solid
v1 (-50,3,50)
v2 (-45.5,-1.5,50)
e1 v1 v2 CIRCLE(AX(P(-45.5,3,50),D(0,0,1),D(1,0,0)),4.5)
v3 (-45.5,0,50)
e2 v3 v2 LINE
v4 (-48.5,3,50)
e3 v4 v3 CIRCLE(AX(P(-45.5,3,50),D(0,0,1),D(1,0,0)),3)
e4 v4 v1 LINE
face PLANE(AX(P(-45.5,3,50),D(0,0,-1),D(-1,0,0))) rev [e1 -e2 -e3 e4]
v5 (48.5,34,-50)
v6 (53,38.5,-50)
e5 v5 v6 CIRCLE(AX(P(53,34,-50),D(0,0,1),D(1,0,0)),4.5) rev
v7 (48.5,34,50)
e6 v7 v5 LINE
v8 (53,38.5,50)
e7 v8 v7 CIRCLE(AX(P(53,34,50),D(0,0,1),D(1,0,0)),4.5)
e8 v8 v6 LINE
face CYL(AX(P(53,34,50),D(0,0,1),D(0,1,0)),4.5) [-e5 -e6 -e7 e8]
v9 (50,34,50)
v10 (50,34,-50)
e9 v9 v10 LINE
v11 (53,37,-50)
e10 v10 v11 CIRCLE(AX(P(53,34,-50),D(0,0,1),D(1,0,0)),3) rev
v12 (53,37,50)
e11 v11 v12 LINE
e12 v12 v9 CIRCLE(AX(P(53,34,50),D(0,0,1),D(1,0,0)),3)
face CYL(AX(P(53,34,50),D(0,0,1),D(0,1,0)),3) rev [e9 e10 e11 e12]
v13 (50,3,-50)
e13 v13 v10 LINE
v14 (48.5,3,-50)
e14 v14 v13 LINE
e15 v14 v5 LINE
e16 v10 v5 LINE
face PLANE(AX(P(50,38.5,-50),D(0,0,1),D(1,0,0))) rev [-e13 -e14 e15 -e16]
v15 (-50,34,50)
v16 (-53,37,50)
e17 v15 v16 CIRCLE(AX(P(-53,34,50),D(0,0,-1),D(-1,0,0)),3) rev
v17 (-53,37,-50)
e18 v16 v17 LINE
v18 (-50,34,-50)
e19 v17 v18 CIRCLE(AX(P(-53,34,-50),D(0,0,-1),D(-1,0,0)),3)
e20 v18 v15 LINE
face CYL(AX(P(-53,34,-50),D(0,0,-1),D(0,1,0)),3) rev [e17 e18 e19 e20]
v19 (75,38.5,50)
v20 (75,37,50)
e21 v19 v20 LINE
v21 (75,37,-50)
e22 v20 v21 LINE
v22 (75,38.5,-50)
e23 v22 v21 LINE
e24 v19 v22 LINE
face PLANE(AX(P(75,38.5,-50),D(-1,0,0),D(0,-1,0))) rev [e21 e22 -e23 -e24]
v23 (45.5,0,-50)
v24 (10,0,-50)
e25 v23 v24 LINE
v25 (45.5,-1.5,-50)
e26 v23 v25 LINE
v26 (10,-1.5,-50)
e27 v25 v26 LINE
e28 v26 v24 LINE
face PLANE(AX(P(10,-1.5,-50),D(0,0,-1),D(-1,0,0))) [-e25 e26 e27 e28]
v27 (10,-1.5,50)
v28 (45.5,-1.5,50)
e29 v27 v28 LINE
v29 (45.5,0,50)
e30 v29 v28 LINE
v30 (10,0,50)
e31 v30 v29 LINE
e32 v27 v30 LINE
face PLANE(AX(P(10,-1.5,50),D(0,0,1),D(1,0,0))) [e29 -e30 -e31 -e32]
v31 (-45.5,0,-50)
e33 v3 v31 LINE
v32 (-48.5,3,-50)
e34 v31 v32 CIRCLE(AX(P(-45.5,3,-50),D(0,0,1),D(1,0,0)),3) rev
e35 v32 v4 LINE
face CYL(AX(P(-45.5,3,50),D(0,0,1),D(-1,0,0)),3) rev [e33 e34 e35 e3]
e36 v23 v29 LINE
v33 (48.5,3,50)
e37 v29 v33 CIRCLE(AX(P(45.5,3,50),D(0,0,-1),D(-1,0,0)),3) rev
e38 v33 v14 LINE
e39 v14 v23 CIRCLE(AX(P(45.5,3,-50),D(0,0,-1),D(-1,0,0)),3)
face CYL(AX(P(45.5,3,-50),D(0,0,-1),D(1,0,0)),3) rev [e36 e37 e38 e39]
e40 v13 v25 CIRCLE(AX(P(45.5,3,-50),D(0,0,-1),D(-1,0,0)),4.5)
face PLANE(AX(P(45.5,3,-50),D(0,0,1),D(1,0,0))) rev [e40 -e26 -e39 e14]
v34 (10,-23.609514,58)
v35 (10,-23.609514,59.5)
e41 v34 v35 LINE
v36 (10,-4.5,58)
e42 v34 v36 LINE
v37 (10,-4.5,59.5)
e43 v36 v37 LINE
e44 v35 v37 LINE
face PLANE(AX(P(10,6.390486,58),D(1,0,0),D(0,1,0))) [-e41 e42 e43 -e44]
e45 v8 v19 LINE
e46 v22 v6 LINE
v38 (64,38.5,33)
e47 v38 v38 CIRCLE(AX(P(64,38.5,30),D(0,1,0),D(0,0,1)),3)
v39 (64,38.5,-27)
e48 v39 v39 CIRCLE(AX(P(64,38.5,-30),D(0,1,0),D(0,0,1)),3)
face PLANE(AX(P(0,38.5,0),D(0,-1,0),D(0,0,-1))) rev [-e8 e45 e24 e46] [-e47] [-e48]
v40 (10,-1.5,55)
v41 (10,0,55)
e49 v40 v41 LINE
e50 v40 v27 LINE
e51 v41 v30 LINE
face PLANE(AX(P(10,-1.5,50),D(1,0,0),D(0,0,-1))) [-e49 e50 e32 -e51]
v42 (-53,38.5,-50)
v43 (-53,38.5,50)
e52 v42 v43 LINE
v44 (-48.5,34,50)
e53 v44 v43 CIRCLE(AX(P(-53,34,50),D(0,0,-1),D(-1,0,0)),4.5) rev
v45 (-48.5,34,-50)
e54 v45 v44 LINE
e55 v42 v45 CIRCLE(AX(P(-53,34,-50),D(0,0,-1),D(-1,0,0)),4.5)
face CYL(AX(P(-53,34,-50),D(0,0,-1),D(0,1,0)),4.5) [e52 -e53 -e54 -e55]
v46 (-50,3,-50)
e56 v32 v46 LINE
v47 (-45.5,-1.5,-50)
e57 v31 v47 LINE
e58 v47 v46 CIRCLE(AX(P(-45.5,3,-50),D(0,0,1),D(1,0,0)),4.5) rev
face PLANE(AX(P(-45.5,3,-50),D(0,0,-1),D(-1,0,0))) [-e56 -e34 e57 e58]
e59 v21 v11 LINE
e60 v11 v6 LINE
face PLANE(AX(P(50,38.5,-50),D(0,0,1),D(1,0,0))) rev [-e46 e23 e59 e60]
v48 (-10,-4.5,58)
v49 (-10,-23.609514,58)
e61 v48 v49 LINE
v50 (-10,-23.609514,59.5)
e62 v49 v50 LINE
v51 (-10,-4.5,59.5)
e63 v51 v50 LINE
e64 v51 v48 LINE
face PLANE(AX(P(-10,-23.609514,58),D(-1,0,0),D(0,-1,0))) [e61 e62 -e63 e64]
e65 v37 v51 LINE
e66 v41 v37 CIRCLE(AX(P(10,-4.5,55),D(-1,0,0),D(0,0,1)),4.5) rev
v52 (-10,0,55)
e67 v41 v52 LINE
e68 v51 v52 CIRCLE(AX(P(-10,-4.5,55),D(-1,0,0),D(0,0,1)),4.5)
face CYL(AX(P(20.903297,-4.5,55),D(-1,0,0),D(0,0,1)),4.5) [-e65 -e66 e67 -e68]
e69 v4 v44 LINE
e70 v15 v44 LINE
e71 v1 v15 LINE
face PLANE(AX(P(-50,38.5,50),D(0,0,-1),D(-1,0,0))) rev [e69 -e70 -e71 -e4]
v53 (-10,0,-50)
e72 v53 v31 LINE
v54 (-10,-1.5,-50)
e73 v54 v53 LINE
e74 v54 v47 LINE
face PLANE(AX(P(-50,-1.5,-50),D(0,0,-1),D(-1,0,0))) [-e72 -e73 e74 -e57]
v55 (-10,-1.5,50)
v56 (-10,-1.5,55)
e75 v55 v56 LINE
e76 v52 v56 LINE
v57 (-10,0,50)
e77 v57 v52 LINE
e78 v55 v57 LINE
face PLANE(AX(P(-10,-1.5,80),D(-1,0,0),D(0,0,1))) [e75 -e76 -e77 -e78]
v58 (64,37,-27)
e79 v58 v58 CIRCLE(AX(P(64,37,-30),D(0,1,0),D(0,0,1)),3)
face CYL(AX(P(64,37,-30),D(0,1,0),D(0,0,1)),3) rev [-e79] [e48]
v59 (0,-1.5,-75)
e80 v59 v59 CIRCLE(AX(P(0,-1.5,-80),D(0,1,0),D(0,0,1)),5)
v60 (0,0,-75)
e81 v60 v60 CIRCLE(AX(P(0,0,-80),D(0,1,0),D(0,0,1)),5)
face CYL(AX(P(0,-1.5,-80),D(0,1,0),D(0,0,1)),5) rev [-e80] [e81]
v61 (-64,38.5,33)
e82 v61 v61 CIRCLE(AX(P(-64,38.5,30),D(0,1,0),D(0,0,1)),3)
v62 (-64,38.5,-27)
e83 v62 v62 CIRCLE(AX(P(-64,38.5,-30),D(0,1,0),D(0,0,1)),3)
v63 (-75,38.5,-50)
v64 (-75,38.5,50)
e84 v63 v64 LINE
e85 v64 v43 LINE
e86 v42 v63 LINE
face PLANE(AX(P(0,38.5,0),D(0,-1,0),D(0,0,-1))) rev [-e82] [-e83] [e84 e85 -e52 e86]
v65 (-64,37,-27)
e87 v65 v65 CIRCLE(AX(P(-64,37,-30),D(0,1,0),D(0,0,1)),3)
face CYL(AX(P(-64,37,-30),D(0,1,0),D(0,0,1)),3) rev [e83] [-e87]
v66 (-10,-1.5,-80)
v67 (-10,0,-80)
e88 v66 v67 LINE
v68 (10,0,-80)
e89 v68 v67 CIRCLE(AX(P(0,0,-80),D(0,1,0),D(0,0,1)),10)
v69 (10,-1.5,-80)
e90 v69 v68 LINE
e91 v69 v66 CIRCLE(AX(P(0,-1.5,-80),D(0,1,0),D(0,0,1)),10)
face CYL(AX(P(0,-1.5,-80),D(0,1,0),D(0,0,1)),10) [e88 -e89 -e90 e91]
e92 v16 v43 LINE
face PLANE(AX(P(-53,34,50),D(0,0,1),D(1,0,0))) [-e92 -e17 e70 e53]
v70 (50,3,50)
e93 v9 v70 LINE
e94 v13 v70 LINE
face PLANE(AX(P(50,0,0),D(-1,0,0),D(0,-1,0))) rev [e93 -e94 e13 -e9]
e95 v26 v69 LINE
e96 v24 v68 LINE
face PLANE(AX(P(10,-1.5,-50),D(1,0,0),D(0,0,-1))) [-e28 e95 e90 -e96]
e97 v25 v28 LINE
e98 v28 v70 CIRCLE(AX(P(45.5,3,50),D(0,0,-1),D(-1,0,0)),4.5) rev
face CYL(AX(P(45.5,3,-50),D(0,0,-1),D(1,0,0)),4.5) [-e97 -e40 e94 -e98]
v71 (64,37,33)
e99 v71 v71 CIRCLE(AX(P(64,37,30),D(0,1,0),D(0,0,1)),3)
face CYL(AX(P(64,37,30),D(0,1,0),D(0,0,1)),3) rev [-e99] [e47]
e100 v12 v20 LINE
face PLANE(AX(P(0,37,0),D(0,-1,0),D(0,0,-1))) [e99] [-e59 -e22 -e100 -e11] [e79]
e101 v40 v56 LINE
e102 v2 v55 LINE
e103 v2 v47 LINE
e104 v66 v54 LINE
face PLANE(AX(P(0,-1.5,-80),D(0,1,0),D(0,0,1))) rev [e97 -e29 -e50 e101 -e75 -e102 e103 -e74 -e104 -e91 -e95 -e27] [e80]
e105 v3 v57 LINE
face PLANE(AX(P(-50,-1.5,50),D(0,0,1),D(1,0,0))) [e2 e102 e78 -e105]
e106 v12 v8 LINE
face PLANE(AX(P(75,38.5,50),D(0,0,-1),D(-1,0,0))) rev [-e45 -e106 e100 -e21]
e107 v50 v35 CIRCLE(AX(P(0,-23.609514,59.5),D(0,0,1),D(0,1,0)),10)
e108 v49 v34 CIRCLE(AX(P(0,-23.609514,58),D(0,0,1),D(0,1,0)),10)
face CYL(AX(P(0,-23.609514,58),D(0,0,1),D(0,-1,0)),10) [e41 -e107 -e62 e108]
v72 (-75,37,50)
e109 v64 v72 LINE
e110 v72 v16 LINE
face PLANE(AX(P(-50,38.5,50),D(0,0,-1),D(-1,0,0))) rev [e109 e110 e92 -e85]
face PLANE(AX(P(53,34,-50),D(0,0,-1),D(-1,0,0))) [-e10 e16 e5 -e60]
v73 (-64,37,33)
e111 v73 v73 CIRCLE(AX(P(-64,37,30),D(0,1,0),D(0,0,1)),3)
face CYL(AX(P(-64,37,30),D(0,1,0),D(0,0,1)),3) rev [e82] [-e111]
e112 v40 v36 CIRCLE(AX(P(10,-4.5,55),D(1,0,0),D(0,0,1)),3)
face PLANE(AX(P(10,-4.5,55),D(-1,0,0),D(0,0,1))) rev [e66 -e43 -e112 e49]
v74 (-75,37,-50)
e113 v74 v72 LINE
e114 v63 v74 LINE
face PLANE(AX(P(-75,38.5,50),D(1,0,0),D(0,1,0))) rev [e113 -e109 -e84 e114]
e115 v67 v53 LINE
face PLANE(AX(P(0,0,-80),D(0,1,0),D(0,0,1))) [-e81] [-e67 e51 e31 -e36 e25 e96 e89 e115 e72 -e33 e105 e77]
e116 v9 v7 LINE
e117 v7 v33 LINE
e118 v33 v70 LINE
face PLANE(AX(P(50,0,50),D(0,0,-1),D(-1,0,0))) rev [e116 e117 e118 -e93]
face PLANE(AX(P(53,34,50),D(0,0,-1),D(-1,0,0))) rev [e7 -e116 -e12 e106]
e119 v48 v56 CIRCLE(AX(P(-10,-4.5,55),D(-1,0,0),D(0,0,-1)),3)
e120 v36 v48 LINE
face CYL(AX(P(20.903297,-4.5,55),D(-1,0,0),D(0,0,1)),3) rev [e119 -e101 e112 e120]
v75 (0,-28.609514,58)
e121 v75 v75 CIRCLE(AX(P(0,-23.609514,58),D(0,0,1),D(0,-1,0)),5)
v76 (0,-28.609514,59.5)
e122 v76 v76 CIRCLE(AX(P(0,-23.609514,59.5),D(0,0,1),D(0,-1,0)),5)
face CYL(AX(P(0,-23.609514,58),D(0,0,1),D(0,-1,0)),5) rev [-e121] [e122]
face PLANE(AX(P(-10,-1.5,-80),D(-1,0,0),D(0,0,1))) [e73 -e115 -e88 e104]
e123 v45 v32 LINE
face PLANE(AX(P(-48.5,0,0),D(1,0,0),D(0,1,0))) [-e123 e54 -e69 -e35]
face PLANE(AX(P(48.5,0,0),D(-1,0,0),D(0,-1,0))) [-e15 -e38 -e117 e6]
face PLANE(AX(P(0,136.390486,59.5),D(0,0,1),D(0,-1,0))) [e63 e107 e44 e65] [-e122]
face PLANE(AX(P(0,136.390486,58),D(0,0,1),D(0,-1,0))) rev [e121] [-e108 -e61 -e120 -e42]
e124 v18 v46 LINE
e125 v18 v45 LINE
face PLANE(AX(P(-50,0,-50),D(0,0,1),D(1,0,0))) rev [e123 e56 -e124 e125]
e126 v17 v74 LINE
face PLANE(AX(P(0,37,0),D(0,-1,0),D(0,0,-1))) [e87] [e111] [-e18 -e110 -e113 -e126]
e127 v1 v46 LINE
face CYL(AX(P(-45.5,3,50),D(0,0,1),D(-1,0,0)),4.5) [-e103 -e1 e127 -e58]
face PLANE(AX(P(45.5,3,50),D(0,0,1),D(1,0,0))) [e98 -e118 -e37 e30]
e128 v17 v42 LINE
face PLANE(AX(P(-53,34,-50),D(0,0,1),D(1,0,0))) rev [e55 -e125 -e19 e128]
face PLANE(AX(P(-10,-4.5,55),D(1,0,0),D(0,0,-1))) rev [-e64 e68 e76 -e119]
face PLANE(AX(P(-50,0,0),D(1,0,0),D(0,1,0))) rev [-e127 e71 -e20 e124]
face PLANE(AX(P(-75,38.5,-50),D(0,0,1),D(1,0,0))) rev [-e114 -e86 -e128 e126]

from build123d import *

# Parameters (mm, degrees)
SKETCH1_R                      = 5
BASE_FLANGE1_DEPTH             = 1.5
EDGE_FLANGE1_STRIP_W           = 12
EDGE_FLANGE1_STRIP_H           = 1.5
EDGE_FLANGE1_STRIP_CUT_DEPTH   = 100
EDGE_FLANGE1_STRIP_2_W         = 12
EDGE_FLANGE1_STRIP_2_H         = 1.5
EDGE_FLANGE1_STRIP_CUT_2_DEPTH = 100
EDGE_FLANGE1_DEPTH             = 100
EDGE_FLANGE1_BEND_DEPTH        = 100
EDGE_FLANGE2_STRIP_W           = 12
EDGE_FLANGE2_STRIP_H           = 1.5
EDGE_FLANGE2_STRIP_CUT_DEPTH   = 100
EDGE_FLANGE2_STRIP_2_W         = 12
EDGE_FLANGE2_STRIP_2_H         = 1.5
EDGE_FLANGE2_STRIP_CUT_2_DEPTH = 100
EDGE_FLANGE2_DEPTH             = 100
EDGE_FLANGE2_BEND_DEPTH        = 100
SKETCHED_START                 = 58.9178
SKETCHED_BEND1_OUTLINE_W       = 20
SKETCHED_BEND1_OUTLINE_H       = 1.5
SKETCHED_BEND1_DEPTH           = 32.0822
SKETCHED_START_2               = 56.266894772
SKETCHED_BEND1_2_OUTLINE_R     = 5
SKETCHED_BEND1_2_DEPTH         = 3.233105228
SKETCHED_START_3               = -10
SKETCHED_BEND1_3_DEPTH         = 20
SKETCHED_BEND1_4_DEPTH         = 20
SKETCH21_R                     = 3
CUT_EXTRUDE1_DEPTH             = 10


with BuildPart() as part:
    # Base-Flange1: sheet metal written as solids
    # Sketch1 → Base-Flange1 (new body)
    with BuildSketch(Plane(origin=(0, 0, 0), x_dir=(1, 0, 0), z_dir=(0, 1, 0))):
        with BuildLine():
            Line((10, 50), (10, 80))
            ThreePointArc((10, 80), (0, 90), (-10, 80))
            Line((-10, 80), (-10, 50))
            Line((-10, 50), (-50, 50))
            Line((-50, 50), (-50, -50))
            Line((-50, -50), (-10, -50))
            Line((-10, -50), (-10, -80))
            ThreePointArc((-10, -80), (0, -90), (10, -80))
            Line((10, -80), (10, -50))
            Line((10, -50), (50, -50))
            Line((50, -50), (50, 50))
            Line((50, 50), (10, 50))
        make_face()
        with Locations(Location((0, 80, 0), (0, 0, 270))):
            Circle(SKETCH1_R, mode=Mode.SUBTRACT)
        with Locations(Location((0, -80, 0), (0, 0, 270))):
            Circle(SKETCH1_R, mode=Mode.SUBTRACT)
    extrude(amount=-BASE_FLANGE1_DEPTH)

    # Edge-Flange1: sheet metal written as solids
    # Edge-Flange1 strip (on a plane across the edge) → Edge-Flange1 strip cut (cut)
    with BuildSketch(Plane(origin=(-50, 0, -50), x_dir=(1, 0, 0), z_dir=(0, 0, 1))):
        with Locations((-1.5, -0.75)):
            Rectangle(EDGE_FLANGE1_STRIP_W, EDGE_FLANGE1_STRIP_H)
    extrude(amount=EDGE_FLANGE1_STRIP_CUT_DEPTH, mode=Mode.SUBTRACT)

    # Edge-Flange1 strip 2 (on a plane across the edge) → Edge-Flange1 strip cut 2 (cut)
    with BuildSketch(Plane(origin=(50, 0, 50), x_dir=(-1, 0, 0), z_dir=(0, 0, -1))):
        with Locations((-1.5, -0.75)):
            Rectangle(EDGE_FLANGE1_STRIP_2_W, EDGE_FLANGE1_STRIP_2_H)
    extrude(amount=EDGE_FLANGE1_STRIP_CUT_2_DEPTH, mode=Mode.SUBTRACT)

    # Edge-Flange1 section (on a plane across the edge) → Edge-Flange1 (add)
    with BuildSketch(Plane(origin=(-50, 0, -50), x_dir=(1, 0, 0), z_dir=(0, 0, 1))):
        with BuildLine():
            Line((0, 3), (0, 38.5))
            Line((0, 38.5), (1.5, 38.5))
            Line((1.5, 38.5), (1.5, 3))
            ThreePointArc((1.5, 3), (2.378679656, 0.878679656), (4.5, 0))
            Line((4.5, 0), (4.5, -1.5))
            ThreePointArc((4.5, -1.5), (1.318019485, -0.181980515), (0, 3))
        make_face()
    extrude(amount=EDGE_FLANGE1_DEPTH)

    # Edge-Flange1 section 2 (on a plane across the edge) → Edge-Flange1 bend (add)
    with BuildSketch(Plane(origin=(50, 0, 50), x_dir=(-1, 0, 0), z_dir=(0, 0, -1))):
        with BuildLine():
            Line((0, 3), (0, 38.5))
            Line((0, 38.5), (1.5, 38.5))
            Line((1.5, 38.5), (1.5, 3))
            ThreePointArc((1.5, 3), (2.378679656, 0.878679656), (4.5, 0))
            Line((4.5, 0), (4.5, -1.5))
            ThreePointArc((4.5, -1.5), (1.318019485, -0.181980515), (0, 3))
        make_face()
    extrude(amount=EDGE_FLANGE1_BEND_DEPTH)

    # Edge-Flange2: sheet metal written as solids
    # Edge-Flange2 strip (on a plane across the edge) → Edge-Flange2 strip cut (cut)
    with BuildSketch(Plane(origin=(-50, 38.5, 50), x_dir=(0, -1, 0), z_dir=(0, 0, -1))):
        with Locations((-1.5, -0.75)):
            Rectangle(EDGE_FLANGE2_STRIP_W, EDGE_FLANGE2_STRIP_H)
    extrude(amount=EDGE_FLANGE2_STRIP_CUT_DEPTH, mode=Mode.SUBTRACT)

    # Edge-Flange2 strip 2 (on a plane across the edge) → Edge-Flange2 strip cut 2 (cut)
    with BuildSketch(Plane(origin=(50, 38.5, -50), x_dir=(0, -1, 0), z_dir=(0, 0, 1))):
        with Locations((-1.5, -0.75)):
            Rectangle(EDGE_FLANGE2_STRIP_2_W, EDGE_FLANGE2_STRIP_2_H)
    extrude(amount=EDGE_FLANGE2_STRIP_CUT_2_DEPTH, mode=Mode.SUBTRACT)

    # Edge-Flange2 section (on a plane across the edge) → Edge-Flange2 (add)
    with BuildSketch(Plane(origin=(-50, 38.5, 50), x_dir=(0, -1, 0), z_dir=(0, 0, -1))):
        with BuildLine():
            Line((0, 3), (0, 25))
            Line((0, 25), (1.5, 25))
            Line((1.5, 25), (1.5, 3))
            ThreePointArc((1.5, 3), (2.378679656, 0.878679656), (4.5, 0))
            Line((4.5, 0), (4.5, -1.5))
            ThreePointArc((4.5, -1.5), (1.318019485, -0.181980515), (0, 3))
        make_face()
    extrude(amount=EDGE_FLANGE2_DEPTH)

    # Edge-Flange2 section 2 (on a plane across the edge) → Edge-Flange2 bend (add)
    with BuildSketch(Plane(origin=(50, 38.5, -50), x_dir=(0, -1, 0), z_dir=(0, 0, 1))):
        with BuildLine():
            Line((0, 3), (0, 25))
            Line((0, 25), (1.5, 25))
            Line((1.5, 25), (1.5, 3))
            ThreePointArc((1.5, 3), (2.378679656, 0.878679656), (4.5, 0))
            Line((4.5, 0), (4.5, -1.5))
            ThreePointArc((4.5, -1.5), (1.318019485, -0.181980515), (0, 3))
        make_face()
    extrude(amount=EDGE_FLANGE2_BEND_DEPTH)

    # Sketched Bend1: read off the stored shape, not the designer's step
    # Sketched Bend1 outline → Sketched Bend1 (cut)
    with BuildSketch(Plane.XY.offset(SKETCHED_START)):
        with Locations((0, -0.75)):
            Rectangle(SKETCHED_BEND1_OUTLINE_W, SKETCHED_BEND1_OUTLINE_H)
    extrude(amount=SKETCHED_BEND1_DEPTH, mode=Mode.SUBTRACT)

    # Sketched Bend1 2 outline → Sketched Bend1 2 (add)
    with BuildSketch(Plane.XY.offset(SKETCHED_START_2)):
        with BuildLine():
            Line((10, -23.609513775), (10, -1.5))
            Line((10, -1.5), (-10, -1.5))
            Line((-10, -1.5), (-10, -23.609513775))
            ThreePointArc((-10, -23.609513775), (0, -33.609513775), (10, -23.609513775))
        make_face()
        with Locations((0, -23.609513775)):
            Circle(SKETCHED_BEND1_2_OUTLINE_R, mode=Mode.SUBTRACT)
    extrude(amount=SKETCHED_BEND1_2_DEPTH)

    # Sketched Bend1 3 outline → Sketched Bend1 3 (cut)
    with BuildSketch(Plane.YZ.offset(SKETCHED_START_3)):
        with BuildLine():
            ThreePointArc((-1.780629183, 56.266894772), (-2.887654552, 57.529889753), (-4.5, 58))
            Line((-4.5, 58), (-35, 58))
            Line((-35, 58), (-35, 56.266894772))
            Line((-35, 56.266894772), (-1.780629183, 56.266894772))
        make_face()
        with BuildLine():
            Line((1, 54), (1, 58.9178))
            Line((1, 58.9178), (-1.5, 58.9178))
            Line((-1.5, 58.9178), (-1.5, 61))
            Line((-1.5, 61), (-35, 61))
            Line((-35, 61), (-35, 59.500000008))
            Line((-35, 59.500000008), (-4.5, 59.5))
            ThreePointArc((-4.5, 59.5), (-1.318019485, 58.181980515), (0, 55))
            Line((0, 55), (0, 54))
            Line((0, 54), (1, 54))
        make_face()
    extrude(amount=SKETCHED_BEND1_3_DEPTH, mode=Mode.SUBTRACT)

    # Sketched Bend1 4 outline → Sketched Bend1 4 (add)
    with BuildSketch(Plane.YZ.offset(SKETCHED_START_3)):
        with BuildLine():
            Line((-0.182016948, 56.266894772), (-1.780629183, 56.266894772))
            ThreePointArc((-1.780629183, 56.266894772), (-1.570997401, 55.6488018), (-1.5, 55))
            Line((-1.5, 55), (-1.500000001, 54))
            Line((-1.500000001, 54), (0, 54))
            Line((0, 54), (0, 55))
            ThreePointArc((0, 55), (-0.045736664, 55.639951665), (-0.182016948, 56.266894772))
        make_face()
    extrude(amount=SKETCHED_BEND1_4_DEPTH)

    # Sketch21 → Cut-Extrude1 (cut)
    with BuildSketch(Plane(origin=(0, 38.5, 0), x_dir=(1, 0, 0), z_dir=(0, 1, 0))):
        with Locations(Location((-64, 30, 0), (0, 0, 270))):
            Circle(SKETCH21_R)
        with Locations(Location((-64, -30, 0), (0, 0, 270))):
            Circle(SKETCH21_R)
        with Locations(Location((64, 30, 0), (0, 0, 270))):
            Circle(SKETCH21_R)
        with Locations(Location((64, -30, 0), (0, 0, 270))):
            Circle(SKETCH21_R)
    extrude(amount=-CUT_EXTRUDE1_DEPTH, mode=Mode.SUBTRACT)


solid = part.part
